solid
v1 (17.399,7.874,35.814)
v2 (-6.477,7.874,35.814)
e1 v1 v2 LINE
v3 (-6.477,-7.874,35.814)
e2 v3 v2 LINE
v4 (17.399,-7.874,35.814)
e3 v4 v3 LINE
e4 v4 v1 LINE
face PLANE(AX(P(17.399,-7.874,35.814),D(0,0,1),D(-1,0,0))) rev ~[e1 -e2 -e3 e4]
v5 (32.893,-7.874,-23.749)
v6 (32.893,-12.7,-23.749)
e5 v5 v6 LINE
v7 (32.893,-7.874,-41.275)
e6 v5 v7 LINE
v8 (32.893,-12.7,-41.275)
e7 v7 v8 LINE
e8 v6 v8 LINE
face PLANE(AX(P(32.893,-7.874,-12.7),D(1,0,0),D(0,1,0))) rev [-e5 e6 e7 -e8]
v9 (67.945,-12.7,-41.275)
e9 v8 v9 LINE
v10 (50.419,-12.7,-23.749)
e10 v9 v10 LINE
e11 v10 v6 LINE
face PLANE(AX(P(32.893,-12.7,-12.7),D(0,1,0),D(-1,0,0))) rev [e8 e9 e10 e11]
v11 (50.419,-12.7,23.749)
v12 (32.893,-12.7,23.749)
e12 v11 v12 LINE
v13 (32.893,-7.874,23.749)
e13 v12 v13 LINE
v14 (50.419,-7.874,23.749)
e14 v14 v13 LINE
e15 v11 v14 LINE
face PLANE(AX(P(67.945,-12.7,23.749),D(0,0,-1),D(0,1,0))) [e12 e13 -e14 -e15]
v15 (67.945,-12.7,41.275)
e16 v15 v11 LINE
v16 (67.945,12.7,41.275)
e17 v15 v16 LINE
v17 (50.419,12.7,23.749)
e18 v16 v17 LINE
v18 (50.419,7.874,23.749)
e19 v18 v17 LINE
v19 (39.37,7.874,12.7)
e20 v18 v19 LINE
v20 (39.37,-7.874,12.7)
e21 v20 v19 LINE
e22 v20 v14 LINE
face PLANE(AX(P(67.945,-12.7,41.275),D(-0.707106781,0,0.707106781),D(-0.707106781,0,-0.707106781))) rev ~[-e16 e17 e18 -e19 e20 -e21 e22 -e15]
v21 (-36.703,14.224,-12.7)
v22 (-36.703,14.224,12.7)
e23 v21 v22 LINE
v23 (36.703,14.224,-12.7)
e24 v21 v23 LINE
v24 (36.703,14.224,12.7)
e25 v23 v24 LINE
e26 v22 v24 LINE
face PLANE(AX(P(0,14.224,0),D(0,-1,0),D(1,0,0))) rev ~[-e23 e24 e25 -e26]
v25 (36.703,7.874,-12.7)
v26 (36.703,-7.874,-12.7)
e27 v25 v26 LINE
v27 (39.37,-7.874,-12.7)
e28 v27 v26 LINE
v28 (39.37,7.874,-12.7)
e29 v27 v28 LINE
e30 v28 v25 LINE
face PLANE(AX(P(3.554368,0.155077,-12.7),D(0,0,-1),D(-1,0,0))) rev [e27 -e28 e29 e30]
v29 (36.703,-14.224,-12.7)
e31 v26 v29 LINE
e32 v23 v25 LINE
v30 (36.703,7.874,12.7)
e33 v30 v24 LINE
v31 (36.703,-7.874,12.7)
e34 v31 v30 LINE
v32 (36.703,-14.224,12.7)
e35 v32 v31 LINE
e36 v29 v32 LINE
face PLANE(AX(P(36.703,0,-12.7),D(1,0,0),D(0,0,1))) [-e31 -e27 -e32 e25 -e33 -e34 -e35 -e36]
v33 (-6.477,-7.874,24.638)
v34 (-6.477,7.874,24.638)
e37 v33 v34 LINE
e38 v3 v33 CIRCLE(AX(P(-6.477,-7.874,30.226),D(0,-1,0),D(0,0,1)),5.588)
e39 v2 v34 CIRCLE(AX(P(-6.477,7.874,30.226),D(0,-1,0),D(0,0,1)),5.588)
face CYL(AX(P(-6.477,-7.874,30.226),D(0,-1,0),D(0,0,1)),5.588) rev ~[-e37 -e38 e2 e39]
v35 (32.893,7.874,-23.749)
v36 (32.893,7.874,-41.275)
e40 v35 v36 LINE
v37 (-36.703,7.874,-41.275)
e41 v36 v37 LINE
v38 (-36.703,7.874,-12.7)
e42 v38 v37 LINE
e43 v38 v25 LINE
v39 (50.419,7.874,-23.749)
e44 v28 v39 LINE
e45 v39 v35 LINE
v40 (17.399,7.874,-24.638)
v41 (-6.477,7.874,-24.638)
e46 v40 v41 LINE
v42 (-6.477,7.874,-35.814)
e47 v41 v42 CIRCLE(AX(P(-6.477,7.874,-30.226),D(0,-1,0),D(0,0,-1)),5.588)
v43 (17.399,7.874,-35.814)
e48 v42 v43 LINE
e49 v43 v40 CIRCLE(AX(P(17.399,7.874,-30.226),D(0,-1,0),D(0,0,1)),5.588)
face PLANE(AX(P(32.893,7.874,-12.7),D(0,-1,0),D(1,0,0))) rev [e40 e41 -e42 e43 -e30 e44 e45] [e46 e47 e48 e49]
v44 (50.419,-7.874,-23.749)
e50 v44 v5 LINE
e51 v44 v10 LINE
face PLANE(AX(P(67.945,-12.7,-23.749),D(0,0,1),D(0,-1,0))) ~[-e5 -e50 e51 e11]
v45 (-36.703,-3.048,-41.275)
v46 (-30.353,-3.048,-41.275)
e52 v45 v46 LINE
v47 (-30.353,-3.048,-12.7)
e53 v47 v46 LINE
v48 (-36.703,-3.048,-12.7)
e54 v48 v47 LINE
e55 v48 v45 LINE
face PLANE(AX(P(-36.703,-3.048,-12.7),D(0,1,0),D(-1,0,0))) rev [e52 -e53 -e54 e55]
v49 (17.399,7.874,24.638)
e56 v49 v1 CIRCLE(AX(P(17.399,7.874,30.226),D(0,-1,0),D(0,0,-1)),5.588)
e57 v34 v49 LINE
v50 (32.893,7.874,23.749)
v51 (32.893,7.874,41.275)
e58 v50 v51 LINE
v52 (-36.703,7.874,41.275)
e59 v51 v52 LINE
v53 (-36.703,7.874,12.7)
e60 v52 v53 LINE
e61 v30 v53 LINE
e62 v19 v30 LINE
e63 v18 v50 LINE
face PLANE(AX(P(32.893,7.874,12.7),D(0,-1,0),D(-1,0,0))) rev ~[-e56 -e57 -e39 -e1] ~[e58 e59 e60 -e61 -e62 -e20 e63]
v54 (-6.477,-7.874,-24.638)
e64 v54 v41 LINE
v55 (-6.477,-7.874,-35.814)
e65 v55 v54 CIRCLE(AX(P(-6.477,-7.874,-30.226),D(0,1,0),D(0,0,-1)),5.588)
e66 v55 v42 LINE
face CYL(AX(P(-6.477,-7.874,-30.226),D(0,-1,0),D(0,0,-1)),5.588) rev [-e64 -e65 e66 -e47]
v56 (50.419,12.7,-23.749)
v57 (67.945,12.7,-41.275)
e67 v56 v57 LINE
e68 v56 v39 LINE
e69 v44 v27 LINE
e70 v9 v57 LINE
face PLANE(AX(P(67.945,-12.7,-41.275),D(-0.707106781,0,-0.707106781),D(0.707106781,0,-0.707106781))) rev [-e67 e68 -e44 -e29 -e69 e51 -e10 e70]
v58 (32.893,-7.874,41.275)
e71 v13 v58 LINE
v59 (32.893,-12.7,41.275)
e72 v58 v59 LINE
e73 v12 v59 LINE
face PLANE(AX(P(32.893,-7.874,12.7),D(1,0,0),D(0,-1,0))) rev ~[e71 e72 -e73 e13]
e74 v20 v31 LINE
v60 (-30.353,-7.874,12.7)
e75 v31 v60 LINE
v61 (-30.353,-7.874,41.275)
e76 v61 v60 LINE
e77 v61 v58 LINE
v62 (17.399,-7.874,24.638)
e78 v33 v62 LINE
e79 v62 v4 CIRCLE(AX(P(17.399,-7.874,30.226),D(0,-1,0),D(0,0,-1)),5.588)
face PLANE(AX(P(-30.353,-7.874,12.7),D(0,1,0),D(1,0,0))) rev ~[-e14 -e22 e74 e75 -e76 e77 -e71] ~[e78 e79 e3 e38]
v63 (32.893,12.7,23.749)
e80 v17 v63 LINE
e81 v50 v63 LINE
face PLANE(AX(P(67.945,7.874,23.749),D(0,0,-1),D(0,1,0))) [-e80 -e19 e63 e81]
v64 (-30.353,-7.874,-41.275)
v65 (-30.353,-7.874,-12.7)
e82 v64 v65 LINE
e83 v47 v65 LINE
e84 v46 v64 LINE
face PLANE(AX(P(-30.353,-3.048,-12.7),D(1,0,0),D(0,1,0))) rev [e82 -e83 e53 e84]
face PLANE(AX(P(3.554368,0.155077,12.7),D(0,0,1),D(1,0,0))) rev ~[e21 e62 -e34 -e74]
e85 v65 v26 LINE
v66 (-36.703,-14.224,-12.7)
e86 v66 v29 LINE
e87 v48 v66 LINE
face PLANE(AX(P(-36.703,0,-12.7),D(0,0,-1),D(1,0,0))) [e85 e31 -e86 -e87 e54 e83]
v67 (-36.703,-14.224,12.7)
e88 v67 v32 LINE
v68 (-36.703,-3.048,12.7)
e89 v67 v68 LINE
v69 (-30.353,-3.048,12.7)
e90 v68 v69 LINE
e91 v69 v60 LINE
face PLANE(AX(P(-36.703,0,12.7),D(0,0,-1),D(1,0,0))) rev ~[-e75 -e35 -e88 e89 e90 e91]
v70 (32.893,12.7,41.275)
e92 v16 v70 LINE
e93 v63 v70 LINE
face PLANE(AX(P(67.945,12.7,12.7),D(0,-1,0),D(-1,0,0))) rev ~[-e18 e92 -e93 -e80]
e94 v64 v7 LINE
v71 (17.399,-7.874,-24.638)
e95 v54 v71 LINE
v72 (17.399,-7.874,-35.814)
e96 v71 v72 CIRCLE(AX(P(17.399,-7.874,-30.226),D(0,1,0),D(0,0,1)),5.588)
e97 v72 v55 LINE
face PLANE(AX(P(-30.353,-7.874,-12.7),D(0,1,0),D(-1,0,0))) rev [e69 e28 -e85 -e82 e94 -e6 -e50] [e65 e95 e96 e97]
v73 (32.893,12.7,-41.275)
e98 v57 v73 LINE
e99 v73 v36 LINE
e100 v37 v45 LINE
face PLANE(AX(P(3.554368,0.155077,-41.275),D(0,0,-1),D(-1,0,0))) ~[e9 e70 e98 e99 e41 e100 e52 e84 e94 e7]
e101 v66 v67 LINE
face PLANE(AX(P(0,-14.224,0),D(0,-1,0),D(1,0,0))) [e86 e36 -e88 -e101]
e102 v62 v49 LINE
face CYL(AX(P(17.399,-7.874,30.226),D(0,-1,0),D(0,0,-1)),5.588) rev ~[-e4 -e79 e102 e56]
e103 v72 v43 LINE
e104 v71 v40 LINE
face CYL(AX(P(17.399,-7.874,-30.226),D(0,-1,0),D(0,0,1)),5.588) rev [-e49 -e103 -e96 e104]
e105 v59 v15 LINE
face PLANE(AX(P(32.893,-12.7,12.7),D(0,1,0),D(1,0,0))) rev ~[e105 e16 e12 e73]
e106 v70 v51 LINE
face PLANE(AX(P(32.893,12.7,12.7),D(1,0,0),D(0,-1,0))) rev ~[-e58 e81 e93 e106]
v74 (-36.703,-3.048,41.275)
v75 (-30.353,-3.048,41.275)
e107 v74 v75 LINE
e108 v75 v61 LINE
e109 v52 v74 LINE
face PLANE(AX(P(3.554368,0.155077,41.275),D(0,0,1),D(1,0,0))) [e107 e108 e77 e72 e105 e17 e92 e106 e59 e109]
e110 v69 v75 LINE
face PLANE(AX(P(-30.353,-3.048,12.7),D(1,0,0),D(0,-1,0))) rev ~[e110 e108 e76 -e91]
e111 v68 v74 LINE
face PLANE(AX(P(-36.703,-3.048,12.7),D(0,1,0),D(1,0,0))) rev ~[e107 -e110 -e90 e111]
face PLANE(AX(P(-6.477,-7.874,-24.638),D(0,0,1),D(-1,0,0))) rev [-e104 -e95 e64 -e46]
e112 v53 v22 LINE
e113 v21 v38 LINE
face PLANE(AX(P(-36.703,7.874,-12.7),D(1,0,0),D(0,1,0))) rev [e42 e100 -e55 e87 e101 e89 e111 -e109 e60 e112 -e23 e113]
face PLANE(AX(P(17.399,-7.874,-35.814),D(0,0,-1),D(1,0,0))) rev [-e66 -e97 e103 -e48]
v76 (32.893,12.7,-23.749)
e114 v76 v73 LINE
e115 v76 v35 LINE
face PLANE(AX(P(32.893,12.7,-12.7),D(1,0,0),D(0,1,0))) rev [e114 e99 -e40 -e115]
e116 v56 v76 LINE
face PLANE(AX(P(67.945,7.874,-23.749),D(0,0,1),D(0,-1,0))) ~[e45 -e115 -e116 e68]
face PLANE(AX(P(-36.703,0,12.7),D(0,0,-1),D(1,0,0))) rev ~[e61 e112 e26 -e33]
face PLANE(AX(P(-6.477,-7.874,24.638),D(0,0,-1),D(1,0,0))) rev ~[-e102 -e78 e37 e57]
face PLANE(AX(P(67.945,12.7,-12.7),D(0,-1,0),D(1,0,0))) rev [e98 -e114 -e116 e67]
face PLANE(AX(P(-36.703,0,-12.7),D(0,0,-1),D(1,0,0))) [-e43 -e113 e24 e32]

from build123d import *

# Parameters (mm, degrees)
F0_W     = 73.406
F0_H     = 25.4
F1_DEPTH = 14.224
F2_W     = 31.242
F2_H     = 25.4
F3_DEPTH = 28.575
F5_DEPTH = 22.099
F6_W     = 4.826
F6_H     = 11.049
F7_DEPTH = 104.649
F9_DEPTH = 26.925


# Not quite as in the source:
# - a pattern or mirror of a feature is missing from the dataset's text; its kind, count and spacing are read off the source's solid


with BuildPart() as f1:
    # F0 (on Front) → F1 (new body, symmetric)
    with BuildSketch(Plane.XZ):
        Rectangle(F0_W, F0_H)
    extrude(amount=F1_DEPTH, both=True)

    # F2 (on face) → F3 (join)
    with BuildSketch(Plane.XY.offset(12.7)):
        Polygon((-36.703, 7.874), (-36.703, -3.048), (-30.353, -3.048), (-30.353, -7.874), (32.893, -7.874), (32.893, -12.7), (36.703, -12.7), (36.703, 12.7), (32.893, 12.7), (32.893, 7.874), align=None)
        with Locations((52.324, 0)):
            Rectangle(F2_W, F2_H)
    f3 = extrude(amount=F3_DEPTH)

    # F3_copies: F3 across plane
    add(f3.mirror(Plane(origin=(0, 0, 0), x_dir=(-1, 0, 0), z_dir=(0, 0, -1))))

    # F4 (on face) → F5 (cut, through all)
    with BuildSketch(Plane.XZ.offset(7.874)):
        with BuildLine():
            ThreePointArc((-6.477, 35.814), (-12.065, 30.226), (-6.477, 24.638))
            Line((-6.477, 24.638), (17.399, 24.638))
            ThreePointArc((17.399, 24.638), (22.987, 30.226), (17.399, 35.814))
            Line((17.399, 35.814), (-6.477, 35.814))
        make_face()
    f5 = extrude(amount=-F5_DEPTH, mode=Mode.SUBTRACT)

    # F5_copies: F5 across plane
    add(f5.mirror(Plane(origin=(0, 0, 0), x_dir=(-1, 0, 0), z_dir=(0, 0, -1))), mode=Mode.SUBTRACT)

    # F6 (on face) → F7 (cut, through all)
    with BuildSketch(Plane.YZ.offset(67.945)):
        with Locations((-10.287, 18.2245)):
            Rectangle(F6_W, F6_H)
        with Locations((10.287, 18.2245)):
            Rectangle(F6_W, F6_H)
    f7 = extrude(amount=-F7_DEPTH, mode=Mode.SUBTRACT)

    # F7_copies: F7 across plane
    add(f7.mirror(Plane(origin=(0, 0, 0), x_dir=(-1, 0, 0), z_dir=(0, 0, -1))), mode=Mode.SUBTRACT)

    # F8 (on face) → F9 (cut, through all)
    with BuildSketch(Plane.XZ.offset(12.7)):
        Polygon((67.945, 41.275), (50.419, 23.749), (67.945, 23.749), align=None)
        Polygon((50.419, 23.749), (39.37, 12.7), (67.945, 12.7), (67.945, 23.749), align=None)
    f9 = extrude(amount=-F9_DEPTH, mode=Mode.SUBTRACT)

    # F9_copies: F9 across plane
    add(f9.mirror(Plane(origin=(0, 0, 0), x_dir=(-1, 0, 0), z_dir=(0, 0, -1))), mode=Mode.SUBTRACT)


solid = f1.part
